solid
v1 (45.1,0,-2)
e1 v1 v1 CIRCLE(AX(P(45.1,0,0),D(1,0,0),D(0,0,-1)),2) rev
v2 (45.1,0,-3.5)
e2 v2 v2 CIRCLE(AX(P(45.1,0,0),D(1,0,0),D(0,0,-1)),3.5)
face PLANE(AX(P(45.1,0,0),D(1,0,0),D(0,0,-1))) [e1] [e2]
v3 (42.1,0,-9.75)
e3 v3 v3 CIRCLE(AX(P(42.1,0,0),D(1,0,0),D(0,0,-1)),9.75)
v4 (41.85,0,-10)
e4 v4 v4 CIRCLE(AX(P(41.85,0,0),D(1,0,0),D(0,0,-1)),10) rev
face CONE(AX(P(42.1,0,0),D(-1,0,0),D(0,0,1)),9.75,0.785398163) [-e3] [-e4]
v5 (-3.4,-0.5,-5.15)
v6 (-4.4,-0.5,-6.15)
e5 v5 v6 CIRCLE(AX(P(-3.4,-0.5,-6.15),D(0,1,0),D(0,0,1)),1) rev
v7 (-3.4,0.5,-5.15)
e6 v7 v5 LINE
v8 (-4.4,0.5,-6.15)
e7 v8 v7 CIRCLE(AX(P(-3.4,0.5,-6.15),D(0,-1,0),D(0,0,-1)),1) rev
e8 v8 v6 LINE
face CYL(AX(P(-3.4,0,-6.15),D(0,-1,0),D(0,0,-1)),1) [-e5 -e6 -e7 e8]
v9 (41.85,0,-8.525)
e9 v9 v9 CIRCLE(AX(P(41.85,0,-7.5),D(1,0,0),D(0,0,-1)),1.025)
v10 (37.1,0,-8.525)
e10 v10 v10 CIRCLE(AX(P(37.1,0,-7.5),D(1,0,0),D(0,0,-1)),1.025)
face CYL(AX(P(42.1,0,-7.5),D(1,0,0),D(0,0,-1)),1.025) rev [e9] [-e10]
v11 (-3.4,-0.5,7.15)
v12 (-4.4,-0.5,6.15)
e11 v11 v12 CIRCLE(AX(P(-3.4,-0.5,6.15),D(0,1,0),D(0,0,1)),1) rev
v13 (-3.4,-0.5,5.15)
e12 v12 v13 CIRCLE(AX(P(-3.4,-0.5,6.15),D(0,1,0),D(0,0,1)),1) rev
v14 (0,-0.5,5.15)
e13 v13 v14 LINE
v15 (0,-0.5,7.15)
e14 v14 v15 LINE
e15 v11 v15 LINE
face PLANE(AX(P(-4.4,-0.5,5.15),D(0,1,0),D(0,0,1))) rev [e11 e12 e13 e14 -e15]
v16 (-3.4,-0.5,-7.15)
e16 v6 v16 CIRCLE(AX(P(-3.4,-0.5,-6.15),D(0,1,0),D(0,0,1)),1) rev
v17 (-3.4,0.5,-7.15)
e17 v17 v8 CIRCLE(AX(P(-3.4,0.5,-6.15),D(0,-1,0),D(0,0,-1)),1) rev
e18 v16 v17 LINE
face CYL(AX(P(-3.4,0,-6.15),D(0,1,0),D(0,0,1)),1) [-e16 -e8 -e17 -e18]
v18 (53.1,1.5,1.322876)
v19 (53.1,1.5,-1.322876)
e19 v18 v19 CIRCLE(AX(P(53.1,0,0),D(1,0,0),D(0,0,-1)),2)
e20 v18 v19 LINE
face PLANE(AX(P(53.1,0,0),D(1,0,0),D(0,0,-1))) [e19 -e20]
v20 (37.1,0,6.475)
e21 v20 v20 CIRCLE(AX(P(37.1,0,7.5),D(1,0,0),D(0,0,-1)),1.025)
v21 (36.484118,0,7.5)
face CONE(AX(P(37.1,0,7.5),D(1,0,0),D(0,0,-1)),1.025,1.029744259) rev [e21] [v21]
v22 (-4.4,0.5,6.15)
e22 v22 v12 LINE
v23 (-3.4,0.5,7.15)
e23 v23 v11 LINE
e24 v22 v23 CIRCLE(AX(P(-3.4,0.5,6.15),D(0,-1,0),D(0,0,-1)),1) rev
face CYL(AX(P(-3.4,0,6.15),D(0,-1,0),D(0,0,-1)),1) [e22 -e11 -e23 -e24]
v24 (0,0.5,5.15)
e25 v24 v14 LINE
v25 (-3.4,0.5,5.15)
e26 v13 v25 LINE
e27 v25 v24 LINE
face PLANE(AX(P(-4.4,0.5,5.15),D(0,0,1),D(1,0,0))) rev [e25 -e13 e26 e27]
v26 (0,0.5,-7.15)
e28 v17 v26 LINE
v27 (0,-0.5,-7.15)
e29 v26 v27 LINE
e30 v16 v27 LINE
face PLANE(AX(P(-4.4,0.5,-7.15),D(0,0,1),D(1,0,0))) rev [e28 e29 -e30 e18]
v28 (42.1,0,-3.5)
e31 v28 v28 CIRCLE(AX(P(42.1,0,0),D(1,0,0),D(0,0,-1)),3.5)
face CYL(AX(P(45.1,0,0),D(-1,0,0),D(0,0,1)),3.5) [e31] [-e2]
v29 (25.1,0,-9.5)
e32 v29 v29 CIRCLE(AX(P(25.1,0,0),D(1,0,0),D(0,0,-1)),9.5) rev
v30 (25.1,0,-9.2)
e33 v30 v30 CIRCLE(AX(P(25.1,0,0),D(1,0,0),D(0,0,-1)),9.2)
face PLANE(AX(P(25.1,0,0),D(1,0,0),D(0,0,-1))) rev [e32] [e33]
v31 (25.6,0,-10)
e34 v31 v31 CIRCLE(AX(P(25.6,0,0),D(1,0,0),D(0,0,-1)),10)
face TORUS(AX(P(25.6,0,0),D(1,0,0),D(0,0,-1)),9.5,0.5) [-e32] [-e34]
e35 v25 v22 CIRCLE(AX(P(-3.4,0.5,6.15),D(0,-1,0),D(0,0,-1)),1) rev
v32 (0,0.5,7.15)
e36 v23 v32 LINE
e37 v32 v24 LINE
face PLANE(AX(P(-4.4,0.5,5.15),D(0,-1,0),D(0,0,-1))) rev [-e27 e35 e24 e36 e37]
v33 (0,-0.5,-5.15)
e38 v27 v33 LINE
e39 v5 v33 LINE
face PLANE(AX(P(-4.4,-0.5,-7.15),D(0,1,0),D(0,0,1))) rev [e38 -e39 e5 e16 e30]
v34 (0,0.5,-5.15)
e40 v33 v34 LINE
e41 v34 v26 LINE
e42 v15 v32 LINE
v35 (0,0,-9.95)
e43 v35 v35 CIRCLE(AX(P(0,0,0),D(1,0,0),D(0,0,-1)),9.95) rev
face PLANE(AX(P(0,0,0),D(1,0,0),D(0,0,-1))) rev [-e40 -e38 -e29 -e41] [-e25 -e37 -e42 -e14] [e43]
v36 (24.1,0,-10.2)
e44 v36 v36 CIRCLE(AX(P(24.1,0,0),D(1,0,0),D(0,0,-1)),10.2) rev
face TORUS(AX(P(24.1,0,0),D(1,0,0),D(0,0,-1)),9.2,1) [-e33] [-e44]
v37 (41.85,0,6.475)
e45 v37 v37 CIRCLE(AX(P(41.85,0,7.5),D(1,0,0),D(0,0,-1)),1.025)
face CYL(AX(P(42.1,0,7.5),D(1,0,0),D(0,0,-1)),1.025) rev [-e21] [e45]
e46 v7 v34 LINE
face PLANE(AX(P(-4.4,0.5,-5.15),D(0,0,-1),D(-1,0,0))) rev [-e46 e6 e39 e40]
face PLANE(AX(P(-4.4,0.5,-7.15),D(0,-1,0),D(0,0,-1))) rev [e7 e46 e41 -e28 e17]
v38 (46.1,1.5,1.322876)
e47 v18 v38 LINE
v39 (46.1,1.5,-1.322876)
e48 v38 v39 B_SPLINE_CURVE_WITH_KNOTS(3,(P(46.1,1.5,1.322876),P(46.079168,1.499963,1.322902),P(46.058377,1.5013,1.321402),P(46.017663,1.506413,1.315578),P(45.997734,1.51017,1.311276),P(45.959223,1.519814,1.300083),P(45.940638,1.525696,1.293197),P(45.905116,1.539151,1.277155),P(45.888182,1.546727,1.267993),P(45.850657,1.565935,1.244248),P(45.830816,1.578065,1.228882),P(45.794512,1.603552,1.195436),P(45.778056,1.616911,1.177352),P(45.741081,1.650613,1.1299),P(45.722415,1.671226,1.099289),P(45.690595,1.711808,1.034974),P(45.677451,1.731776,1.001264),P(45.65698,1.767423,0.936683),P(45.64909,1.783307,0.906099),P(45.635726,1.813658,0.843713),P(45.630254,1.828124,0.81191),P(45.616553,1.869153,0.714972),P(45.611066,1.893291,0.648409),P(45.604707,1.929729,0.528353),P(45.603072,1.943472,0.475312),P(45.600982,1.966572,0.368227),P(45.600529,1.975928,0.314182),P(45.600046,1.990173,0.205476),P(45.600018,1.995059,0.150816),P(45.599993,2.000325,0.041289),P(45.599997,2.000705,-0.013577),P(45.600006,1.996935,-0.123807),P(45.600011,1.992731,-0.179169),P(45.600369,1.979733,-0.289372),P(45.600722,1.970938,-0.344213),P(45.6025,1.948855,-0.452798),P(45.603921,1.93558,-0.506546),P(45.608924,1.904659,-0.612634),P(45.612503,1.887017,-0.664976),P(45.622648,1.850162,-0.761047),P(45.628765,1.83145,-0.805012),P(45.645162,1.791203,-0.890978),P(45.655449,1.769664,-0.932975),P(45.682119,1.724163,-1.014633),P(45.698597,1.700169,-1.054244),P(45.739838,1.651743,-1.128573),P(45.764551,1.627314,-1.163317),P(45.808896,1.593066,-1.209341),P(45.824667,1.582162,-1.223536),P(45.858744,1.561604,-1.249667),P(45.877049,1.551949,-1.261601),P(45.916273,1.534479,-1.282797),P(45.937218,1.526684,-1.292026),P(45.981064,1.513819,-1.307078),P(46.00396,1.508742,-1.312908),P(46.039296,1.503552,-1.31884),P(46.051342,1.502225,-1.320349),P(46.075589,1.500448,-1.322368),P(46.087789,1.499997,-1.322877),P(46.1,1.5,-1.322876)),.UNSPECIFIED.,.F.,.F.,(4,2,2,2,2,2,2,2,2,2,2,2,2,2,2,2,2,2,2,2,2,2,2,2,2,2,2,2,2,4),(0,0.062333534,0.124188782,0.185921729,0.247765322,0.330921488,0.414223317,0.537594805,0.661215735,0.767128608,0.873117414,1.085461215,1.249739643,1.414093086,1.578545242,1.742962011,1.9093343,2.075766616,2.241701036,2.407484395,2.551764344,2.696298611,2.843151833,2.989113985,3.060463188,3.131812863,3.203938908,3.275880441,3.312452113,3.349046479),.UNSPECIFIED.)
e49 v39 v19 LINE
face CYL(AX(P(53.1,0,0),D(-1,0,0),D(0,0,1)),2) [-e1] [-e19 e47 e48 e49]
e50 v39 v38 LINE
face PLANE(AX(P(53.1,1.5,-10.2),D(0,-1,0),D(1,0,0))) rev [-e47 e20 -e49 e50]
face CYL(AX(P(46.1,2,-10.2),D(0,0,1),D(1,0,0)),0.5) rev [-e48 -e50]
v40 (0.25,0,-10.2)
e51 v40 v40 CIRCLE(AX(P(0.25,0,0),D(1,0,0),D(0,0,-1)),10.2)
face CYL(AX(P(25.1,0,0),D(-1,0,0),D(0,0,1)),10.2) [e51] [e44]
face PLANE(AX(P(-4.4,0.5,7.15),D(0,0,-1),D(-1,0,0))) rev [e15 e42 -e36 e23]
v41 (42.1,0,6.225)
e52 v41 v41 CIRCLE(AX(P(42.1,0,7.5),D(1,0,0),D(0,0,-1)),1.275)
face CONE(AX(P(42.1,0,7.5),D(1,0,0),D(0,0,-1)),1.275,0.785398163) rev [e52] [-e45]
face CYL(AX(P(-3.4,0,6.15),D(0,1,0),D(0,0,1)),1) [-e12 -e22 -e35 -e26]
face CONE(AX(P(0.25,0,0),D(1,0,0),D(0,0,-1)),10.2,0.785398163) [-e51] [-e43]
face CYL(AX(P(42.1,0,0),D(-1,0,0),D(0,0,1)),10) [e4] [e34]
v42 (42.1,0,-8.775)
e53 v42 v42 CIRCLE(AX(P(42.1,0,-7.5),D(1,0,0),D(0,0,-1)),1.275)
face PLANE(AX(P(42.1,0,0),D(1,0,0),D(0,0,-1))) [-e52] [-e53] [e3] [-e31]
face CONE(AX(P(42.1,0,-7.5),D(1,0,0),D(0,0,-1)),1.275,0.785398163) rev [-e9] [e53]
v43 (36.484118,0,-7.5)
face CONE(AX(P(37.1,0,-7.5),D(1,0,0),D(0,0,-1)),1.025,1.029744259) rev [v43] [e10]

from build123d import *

# Parameters (mm, degrees)
SKETCH1_R                          = 10.2
BOSS_EXTRUDE1_DEPTH                = 25.1
FILLET1_R                          = 1
SKETCH2_R                          = 10
BOSS_EXTRUDE2_DEPTH                = 17
FILLET2_R                          = 0.5
CHAMFER1_SIZE                      = 0.25
SKETCH3_R                          = 3.5
BOSS_EXTRUDE3_DEPTH                = 3
SKETCH4_R                          = 2
BOSS_EXTRUDE4_DEPTH                = 11
CUT_EXTRUDE1_DEPTH                 = 56.024449111
CUT_EXTRUDE1_DEPTH_BACK            = 56.024449111
M2_5X0_45_TAPPED_HOLE1_D           = 2.05
M2_5X0_45_TAPPED_HOLE1_DEPTH       = 5
M2_5X0_45_TAPPED_HOLE1_CSINK_D     = 2.55
M2_5X0_45_TAPPED_HOLE1_CSINK_ANGLE = 90
M2_5X0_45_TAPPED_HOLE1_TIP         = 0.615882135
SKETCH9_W                          = 2
SKETCH9_H                          = 1
BOSS_EXTRUDE5_DEPTH                = 4.4
FILLET3_R                          = 1


with BuildPart() as part:
    # Sketch1 → Boss-Extrude1 (new body)
    with BuildSketch(Plane(origin=(0, 0, 0), x_dir=(0, 0, -1), z_dir=(1, 0, 0))):
        Circle(SKETCH1_R)
    extrude(amount=BOSS_EXTRUDE1_DEPTH)

    # Fillet1
    fillet1_edges = [part.edges().sort_by_distance(p)[0] for p in [
        (25.1, 0, 10.2),
    ]]
    fillet(fillet1_edges, radius=FILLET1_R)

    # Sketch2 → Boss-Extrude2 (add)
    with BuildSketch(Plane(origin=(25.1, 0, 0), x_dir=(0, 0, -1), z_dir=(1, 0, 0))):
        Circle(SKETCH2_R)
    extrude(amount=BOSS_EXTRUDE2_DEPTH)

    # Fillet2
    fillet2_edges = [part.edges().sort_by_distance(p)[0] for p in [
        (25.1, 0, 10),
    ]]
    fillet(fillet2_edges, radius=FILLET2_R)

    # Chamfer1
    chamfer1_edges = [part.edges().sort_by_distance(p)[0] for p in [
        (0, 0, 10.2),
        (42.1, 0, 10),
    ]]
    chamfer(chamfer1_edges, length=CHAMFER1_SIZE)

    # Sketch3 → Boss-Extrude3 (add)
    with BuildSketch(Plane(origin=(42.1, 0, 0), x_dir=(0, 0, -1), z_dir=(1, 0, 0))):
        Circle(SKETCH3_R)
    extrude(amount=BOSS_EXTRUDE3_DEPTH)

    # Sketch4 → Boss-Extrude4 (add)
    with BuildSketch(Plane(origin=(42.1, 0, 0), x_dir=(0, 0, -1), z_dir=(1, 0, 0))):
        Circle(SKETCH4_R)
    extrude(amount=BOSS_EXTRUDE4_DEPTH)

    # Sketch6 → Cut-Extrude1 (cut, two sides: drawn at the far end of the back side and taken through both)
    with BuildSketch(Plane.XY.offset(-CUT_EXTRUDE1_DEPTH_BACK)):
        with BuildLine():
            Line((53.1, 2), (45.6, 2))
            ThreePointArc((45.6, 2), (45.746446609, 1.646446609), (46.1, 1.5))
            Line((46.1, 1.5), (53.1, 1.5))
            Line((53.1, 1.5), (53.1, 2))
        make_face()
    extrude(amount=CUT_EXTRUDE1_DEPTH + CUT_EXTRUDE1_DEPTH_BACK, mode=Mode.SUBTRACT)

    # M2.5x0.45 Tapped Hole1
    with Locations(Plane(origin=(42.1, 0, 0), x_dir=(0, 0, -1), z_dir=(1, 0, 0))):
        with Locations((-7.5, 0), (7.5, 0)):
            CounterSinkHole(M2_5X0_45_TAPPED_HOLE1_D / 2, M2_5X0_45_TAPPED_HOLE1_CSINK_D / 2, depth=M2_5X0_45_TAPPED_HOLE1_DEPTH, counter_sink_angle=M2_5X0_45_TAPPED_HOLE1_CSINK_ANGLE)
            with Locations((0, 0, -(M2_5X0_45_TAPPED_HOLE1_DEPTH + M2_5X0_45_TAPPED_HOLE1_TIP / 2))):  # 118° drill point
                Cone(0, M2_5X0_45_TAPPED_HOLE1_D / 2, M2_5X0_45_TAPPED_HOLE1_TIP, mode=Mode.SUBTRACT)

    # Sketch9 → Boss-Extrude5 (add)
    with BuildSketch(Plane.ZY):
        with Locations((-6.15, 0)):
            Rectangle(SKETCH9_W, SKETCH9_H)
        with Locations((6.15, 0)):
            Rectangle(SKETCH9_W, SKETCH9_H)
    extrude(amount=BOSS_EXTRUDE5_DEPTH)

    # Fillet3
    fillet3_edges = [part.edges().sort_by_distance(p)[0] for p in [
        (-4.4, 0, 7.15),
        (-4.4, 0, 5.15),
        (-4.4, 0, -5.15),
        (-4.4, 0, -7.15),
    ]]
    fillet(fillet3_edges, radius=FILLET3_R - 0.0001)  # a hair under: the kernel refuses the full size


solid = part.part
